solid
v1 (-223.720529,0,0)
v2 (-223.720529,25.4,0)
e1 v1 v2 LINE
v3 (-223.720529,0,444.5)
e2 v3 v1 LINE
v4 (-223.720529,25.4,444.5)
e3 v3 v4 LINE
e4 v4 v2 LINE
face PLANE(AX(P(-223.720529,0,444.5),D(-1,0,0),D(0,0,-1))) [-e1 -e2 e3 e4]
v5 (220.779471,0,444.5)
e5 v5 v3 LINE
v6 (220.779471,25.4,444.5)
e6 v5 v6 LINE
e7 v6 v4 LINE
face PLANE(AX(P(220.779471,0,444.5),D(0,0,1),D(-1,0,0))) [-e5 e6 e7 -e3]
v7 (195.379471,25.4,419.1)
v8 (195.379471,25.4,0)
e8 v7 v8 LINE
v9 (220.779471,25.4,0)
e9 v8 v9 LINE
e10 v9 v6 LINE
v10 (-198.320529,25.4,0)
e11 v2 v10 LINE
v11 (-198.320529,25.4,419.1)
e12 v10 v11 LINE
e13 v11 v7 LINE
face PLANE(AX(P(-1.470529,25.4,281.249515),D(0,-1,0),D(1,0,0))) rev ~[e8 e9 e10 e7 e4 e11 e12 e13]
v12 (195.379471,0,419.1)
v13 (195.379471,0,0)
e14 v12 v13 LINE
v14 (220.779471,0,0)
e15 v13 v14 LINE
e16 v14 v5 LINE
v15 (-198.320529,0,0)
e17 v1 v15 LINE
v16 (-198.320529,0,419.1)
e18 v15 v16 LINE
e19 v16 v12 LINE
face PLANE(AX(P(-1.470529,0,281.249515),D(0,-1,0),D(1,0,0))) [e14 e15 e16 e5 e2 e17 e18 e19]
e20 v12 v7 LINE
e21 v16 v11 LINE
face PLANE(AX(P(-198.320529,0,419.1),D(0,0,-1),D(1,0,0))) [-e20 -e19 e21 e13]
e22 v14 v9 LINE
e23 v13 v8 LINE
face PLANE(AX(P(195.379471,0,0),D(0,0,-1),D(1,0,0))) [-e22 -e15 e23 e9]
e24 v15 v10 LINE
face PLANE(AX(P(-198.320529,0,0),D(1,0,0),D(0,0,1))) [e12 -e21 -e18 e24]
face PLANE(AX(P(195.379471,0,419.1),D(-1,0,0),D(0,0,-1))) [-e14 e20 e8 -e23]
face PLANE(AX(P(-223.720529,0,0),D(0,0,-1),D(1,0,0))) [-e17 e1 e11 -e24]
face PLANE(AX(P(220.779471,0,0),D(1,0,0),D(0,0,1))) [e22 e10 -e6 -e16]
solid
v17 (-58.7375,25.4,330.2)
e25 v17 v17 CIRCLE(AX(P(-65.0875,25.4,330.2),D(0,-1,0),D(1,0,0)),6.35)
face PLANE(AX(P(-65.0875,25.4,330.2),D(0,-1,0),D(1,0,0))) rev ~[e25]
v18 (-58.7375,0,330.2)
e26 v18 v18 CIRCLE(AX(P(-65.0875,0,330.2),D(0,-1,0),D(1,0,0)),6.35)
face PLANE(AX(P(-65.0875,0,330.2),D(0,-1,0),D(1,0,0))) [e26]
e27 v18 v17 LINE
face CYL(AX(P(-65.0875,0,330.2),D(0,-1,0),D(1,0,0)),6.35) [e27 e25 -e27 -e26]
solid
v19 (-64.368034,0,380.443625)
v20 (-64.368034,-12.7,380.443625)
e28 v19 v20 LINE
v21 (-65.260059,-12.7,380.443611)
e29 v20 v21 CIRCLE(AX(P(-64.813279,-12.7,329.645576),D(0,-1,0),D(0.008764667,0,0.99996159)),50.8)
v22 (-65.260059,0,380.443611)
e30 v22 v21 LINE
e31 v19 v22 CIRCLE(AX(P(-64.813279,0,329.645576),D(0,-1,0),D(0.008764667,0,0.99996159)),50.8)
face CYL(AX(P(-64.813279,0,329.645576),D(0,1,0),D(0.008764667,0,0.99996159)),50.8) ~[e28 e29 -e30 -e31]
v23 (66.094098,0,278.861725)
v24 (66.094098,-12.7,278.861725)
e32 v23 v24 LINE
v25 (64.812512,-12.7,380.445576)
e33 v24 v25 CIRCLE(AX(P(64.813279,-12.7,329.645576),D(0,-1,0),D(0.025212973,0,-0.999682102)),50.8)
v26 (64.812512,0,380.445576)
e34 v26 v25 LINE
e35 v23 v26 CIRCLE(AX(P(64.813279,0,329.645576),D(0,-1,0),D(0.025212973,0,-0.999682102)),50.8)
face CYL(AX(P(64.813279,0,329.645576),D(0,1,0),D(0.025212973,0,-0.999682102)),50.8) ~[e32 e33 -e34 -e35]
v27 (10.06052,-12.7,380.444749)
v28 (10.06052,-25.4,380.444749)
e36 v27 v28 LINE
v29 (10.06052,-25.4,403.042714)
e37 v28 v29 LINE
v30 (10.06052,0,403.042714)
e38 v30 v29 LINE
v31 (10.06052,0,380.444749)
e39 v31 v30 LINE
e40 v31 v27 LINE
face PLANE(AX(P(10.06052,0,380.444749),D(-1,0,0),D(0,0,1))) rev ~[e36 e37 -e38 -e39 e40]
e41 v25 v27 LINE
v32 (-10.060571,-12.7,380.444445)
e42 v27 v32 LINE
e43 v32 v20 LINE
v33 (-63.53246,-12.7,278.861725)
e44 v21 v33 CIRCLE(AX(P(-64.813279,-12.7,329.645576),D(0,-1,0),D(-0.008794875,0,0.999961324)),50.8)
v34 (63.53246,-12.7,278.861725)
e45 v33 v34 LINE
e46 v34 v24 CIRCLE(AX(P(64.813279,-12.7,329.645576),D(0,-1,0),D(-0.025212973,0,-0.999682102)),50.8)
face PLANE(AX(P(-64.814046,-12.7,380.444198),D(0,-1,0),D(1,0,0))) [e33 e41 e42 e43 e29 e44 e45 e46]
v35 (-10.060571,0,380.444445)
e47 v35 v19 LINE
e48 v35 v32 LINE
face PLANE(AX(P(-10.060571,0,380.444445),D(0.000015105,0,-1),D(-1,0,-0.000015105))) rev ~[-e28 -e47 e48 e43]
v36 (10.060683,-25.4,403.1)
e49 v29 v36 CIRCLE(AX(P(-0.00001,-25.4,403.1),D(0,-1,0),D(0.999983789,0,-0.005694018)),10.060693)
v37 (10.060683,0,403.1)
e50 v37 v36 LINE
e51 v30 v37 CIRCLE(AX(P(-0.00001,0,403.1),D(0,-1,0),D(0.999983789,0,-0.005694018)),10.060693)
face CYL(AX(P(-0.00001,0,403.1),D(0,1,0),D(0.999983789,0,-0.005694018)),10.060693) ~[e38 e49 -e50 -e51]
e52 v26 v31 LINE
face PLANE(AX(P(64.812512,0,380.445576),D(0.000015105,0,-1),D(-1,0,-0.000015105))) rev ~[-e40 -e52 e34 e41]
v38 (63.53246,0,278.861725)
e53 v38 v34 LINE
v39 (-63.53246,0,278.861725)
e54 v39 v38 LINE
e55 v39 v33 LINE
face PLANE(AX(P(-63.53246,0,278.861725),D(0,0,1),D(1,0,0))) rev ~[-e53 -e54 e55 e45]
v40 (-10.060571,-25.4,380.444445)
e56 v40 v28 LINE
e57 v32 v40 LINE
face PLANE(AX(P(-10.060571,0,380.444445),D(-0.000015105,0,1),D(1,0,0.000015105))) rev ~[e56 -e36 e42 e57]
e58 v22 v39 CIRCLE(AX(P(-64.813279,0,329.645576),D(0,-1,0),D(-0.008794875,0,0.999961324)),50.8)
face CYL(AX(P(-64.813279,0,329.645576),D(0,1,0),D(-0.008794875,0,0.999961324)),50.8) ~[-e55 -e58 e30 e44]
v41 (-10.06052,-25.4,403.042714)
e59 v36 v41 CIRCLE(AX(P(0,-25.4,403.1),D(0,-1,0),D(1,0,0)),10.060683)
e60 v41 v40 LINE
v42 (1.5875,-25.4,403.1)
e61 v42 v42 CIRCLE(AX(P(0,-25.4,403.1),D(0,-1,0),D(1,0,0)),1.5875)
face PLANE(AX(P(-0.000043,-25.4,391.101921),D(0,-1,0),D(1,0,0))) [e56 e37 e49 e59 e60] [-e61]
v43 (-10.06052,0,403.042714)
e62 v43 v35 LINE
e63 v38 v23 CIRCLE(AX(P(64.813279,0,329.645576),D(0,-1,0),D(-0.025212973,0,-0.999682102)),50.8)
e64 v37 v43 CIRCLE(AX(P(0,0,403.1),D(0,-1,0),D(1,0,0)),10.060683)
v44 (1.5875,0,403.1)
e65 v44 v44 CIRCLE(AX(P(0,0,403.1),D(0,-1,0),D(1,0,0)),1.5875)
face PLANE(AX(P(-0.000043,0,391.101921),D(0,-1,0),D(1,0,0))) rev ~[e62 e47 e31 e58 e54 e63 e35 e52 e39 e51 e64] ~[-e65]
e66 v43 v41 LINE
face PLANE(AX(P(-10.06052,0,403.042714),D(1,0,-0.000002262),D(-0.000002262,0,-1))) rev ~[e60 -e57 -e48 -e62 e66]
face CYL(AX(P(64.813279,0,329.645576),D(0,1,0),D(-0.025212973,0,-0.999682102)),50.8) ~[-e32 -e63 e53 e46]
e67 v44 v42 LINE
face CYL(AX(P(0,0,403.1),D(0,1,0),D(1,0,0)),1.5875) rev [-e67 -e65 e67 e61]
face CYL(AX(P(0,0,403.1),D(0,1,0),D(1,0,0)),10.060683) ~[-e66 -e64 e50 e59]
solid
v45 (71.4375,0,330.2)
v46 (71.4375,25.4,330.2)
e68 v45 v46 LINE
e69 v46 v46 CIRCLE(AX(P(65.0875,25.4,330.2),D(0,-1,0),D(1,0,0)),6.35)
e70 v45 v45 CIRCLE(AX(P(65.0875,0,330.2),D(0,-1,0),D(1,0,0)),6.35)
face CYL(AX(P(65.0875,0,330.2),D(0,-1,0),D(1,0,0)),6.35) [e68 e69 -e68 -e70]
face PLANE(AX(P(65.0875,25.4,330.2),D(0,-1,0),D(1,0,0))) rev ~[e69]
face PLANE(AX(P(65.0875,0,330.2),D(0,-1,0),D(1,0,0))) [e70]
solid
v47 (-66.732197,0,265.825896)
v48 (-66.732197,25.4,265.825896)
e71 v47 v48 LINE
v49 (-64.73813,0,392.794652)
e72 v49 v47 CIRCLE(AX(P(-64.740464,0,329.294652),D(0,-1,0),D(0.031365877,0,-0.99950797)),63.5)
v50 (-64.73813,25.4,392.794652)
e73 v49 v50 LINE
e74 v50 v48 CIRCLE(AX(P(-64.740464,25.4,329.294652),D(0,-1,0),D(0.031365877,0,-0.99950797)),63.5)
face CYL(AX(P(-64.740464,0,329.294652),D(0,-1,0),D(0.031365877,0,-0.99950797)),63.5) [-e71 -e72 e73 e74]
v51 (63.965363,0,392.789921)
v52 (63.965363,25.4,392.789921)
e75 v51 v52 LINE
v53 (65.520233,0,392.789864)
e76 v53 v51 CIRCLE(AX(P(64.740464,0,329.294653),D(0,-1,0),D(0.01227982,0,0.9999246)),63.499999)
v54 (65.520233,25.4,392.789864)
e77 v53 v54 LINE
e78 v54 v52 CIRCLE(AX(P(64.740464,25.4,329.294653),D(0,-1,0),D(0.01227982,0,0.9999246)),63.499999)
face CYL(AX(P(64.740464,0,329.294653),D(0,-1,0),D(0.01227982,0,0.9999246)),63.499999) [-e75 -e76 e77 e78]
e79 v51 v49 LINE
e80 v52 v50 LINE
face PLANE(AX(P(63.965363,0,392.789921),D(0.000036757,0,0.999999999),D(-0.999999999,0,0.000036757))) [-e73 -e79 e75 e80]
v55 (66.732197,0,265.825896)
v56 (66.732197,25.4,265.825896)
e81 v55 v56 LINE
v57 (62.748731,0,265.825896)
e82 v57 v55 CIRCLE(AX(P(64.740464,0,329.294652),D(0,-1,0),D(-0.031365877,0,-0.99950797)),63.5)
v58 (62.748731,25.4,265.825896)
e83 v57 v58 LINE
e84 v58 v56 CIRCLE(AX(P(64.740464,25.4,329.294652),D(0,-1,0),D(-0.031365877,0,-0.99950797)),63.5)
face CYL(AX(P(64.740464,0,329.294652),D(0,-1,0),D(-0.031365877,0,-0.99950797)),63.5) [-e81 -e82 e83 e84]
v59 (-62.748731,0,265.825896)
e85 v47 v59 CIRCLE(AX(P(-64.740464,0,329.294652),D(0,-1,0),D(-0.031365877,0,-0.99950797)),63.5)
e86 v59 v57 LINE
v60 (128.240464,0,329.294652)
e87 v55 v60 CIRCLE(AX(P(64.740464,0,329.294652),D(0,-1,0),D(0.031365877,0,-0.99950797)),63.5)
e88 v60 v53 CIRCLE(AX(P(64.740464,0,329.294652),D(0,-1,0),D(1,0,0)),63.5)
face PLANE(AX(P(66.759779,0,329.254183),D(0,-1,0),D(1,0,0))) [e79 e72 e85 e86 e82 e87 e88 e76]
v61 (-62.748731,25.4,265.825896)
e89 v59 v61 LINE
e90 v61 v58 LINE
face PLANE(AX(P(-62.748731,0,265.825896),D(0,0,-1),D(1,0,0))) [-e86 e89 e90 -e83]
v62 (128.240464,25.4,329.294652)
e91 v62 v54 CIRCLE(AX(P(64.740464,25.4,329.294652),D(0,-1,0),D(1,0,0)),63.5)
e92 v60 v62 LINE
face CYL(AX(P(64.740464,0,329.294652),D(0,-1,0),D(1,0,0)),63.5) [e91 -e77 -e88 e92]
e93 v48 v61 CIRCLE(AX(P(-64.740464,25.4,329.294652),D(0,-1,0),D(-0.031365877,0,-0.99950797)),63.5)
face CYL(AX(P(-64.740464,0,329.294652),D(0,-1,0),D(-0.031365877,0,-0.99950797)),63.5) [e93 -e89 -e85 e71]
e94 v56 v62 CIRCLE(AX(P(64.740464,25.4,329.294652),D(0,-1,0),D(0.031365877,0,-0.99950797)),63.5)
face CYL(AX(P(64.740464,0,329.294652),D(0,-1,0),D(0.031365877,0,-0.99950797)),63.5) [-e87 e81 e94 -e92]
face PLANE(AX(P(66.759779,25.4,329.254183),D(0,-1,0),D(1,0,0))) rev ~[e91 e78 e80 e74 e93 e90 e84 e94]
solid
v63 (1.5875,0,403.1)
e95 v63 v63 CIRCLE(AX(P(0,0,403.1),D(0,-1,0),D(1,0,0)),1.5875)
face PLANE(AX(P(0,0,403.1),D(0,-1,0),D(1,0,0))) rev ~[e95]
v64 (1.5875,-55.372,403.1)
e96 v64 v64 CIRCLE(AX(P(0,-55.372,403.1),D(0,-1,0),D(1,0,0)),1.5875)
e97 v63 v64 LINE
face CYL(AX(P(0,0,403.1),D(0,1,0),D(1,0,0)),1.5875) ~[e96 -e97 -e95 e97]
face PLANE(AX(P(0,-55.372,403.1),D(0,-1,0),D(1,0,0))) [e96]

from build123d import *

# Parameters (mm, degrees)
F1_DEPTH = 25.4
F2_R     = 6.35
F3_DEPTH = 12.7
F2_R_2   = 1.5875
F4_DEPTH = 25.4
F5_DEPTH = 55.372
F6_DEPTH = 25.4
F8_DEPTH = 25.4


with BuildPart() as f1:
    # F0 (on Front) → F1 (new body)
    with BuildSketch(Plane.XZ):
        Polygon((220.7794714003, 444.5), (-223.7205285997, 444.5), (-223.7205285997, 0), (-198.3205285997, 0), (-198.3205285997, 419.1), (195.3794714003, 419.1), (195.3794714003, 0), (220.7794714003, 0), align=None)
    extrude(amount=-F1_DEPTH)


with BuildPart() as f3:
    # F2 (on face) → F3 (new body)
    with BuildSketch(Plane.XZ):
        with BuildLine():
            Line((-65.2600586708, 380.4436114409), (-64.3680339263, 380.4436249147))
            ThreePointArc((-64.3680339263, 380.4436249147), (-64.8140463281, 380.4455761588), (-65.2600586708, 380.4436114409))
        make_face()
        with BuildLine():
            Line((-10.0605708618, 380.4444452172), (-64.3680339263, 380.4436249147))
            Line((-64.3680339263, 380.4436249147), (-65.2600586708, 380.4436114409))
            ThreePointArc((-65.2600586708, 380.4436114409), (-115.6059339898, 328.7817476998), (-63.532459971, 278.8617253594))
            Line((-63.532459971, 278.8617253594), (63.532459971, 278.8617253594))
            Line((63.532459971, 278.8617253594), (66.0940980393, 278.8617253594))
            ThreePointArc((66.0940980393, 278.8617253594), (115.6092367076, 330.2864202149), (64.8125116822, 380.4455761588))
            Line((64.8125116822, 380.4455761588), (10.060519749, 380.4447491419))
            Line((10.060519749, 380.4447491419), (10.060519749, 330.9917804861))
            ThreePointArc((10.060519749, 330.9917804861), (10.0606420697, 330.963137726), (10.0606828434, 330.9344947338))
            ThreePointArc((10.0606828434, 330.9344947338), (10.0606420697, 330.9058517416), (10.060519749, 330.8772089815))
            ThreePointArc((10.060519749, 330.8772089815), (-0.0286543698, 320.8738526965), (-10.0606828434, 330.9345174891))
            Line((-10.0606828434, 330.9345174891), (-10.0605708618, 380.4444452172))
        make_face()
        with Locations((-65.0875, 330.2)):
            Circle(F2_R, mode=Mode.SUBTRACT)
        with Locations((65.0875, 330.2)):
            Circle(F2_R, mode=Mode.SUBTRACT)
        with BuildLine():
            Line((10.060519749, 380.4447491419), (-10.0605708618, 380.4444452172))
            Line((-10.0605708618, 380.4444452172), (-10.0606828434, 330.9345174891))
            ThreePointArc((-10.0606828434, 330.9345174891), (-0.0286316146, 340.9951368359), (10.060519749, 330.9917804861))
            Line((10.060519749, 330.9917804861), (10.060519749, 380.4447491419))
        make_face()
        with BuildLine():
            ThreePointArc((10.060519749, 330.9917804861), (-0.0286316146, 340.9951368359), (-10.0606828434, 330.9345174891))
            ThreePointArc((-10.0606828434, 330.9345174891), (-0.0286543698, 320.8738526965), (10.060519749, 330.8772089815))
            Line((10.060519749, 330.8772089815), (10.060519749, 330.9917804861))
        make_face()
        with BuildLine():
            Line((66.0940980393, 278.8617253594), (63.532459971, 278.8617253594))
            ThreePointArc((63.532459971, 278.8617253594), (64.8132790052, 278.8455761646), (66.0940980393, 278.8617253594))
        make_face()
        with BuildLine():
            ThreePointArc((10.0606828434, 330.9344947338), (10.0606420697, 330.963137726), (10.060519749, 330.9917804861))
            Line((10.060519749, 330.9917804861), (10.060519749, 330.8772089815))
            ThreePointArc((10.060519749, 330.8772089815), (10.0606420697, 330.9058517416), (10.0606828434, 330.9344947338))
        make_face()
        with Locations((-65.0875, 330.2)):
            Circle(F2_R)
        with Locations((65.0875, 330.2)):
            Circle(F2_R)
    extrude(amount=F3_DEPTH)

    # F2 (on face) → F4 (join)
    with BuildSketch(Plane.XZ):
        with BuildLine():
            Line((-10.060519749, 403.0427142477), (-10.0605708618, 380.4444452172))
            Line((-10.0605708618, 380.4444452172), (10.060519749, 380.4447491419))
            Line((10.060519749, 380.4447491419), (10.060519749, 403.0427142477))
            ThreePointArc((10.060519749, 403.0427142477), (0, 393.0393171566), (-10.060519749, 403.0427142477))
        make_face()
        with BuildLine():
            ThreePointArc((10.0606828434, 403.1), (-0.0286429922, 413.1606420697), (-10.060519749, 403.0427142477))
            ThreePointArc((-10.060519749, 403.0427142477), (0, 393.0393171566), (10.060519749, 403.0427142477))
            ThreePointArc((10.060519749, 403.0427142477), (10.0606420697, 403.0713570078), (10.0606828434, 403.1))
        make_face()
        with Locations((0, 403.1)):
            Circle(F2_R_2, mode=Mode.SUBTRACT)
    extrude(amount=F4_DEPTH)


with BuildPart() as f5:
    # F2 (on face) → F5 (new body)
    with BuildSketch(Plane.XZ):
        with Locations((0, 403.1)):
            Circle(F2_R_2)
    extrude(amount=F5_DEPTH)


with BuildPart() as f6:
    # F2 (on face) → F6 (new body)
    with BuildSketch(Plane.XZ):
        with Locations((65.0875, 330.2)):
            Circle(F2_R)
    extrude(amount=-F6_DEPTH)


with BuildPart() as f6b:
    # F2 (on face) → F6, piece 2 (new body)
    with BuildSketch(Plane.XZ):
        with Locations((-65.0875, 330.2)):
            Circle(F2_R)
    extrude(amount=-F6_DEPTH)


with BuildPart() as f8:
    # F7 (on face) → F8 (new body)
    with BuildSketch(Plane.XZ):
        with BuildLine():
            ThreePointArc((66.7321972552, 265.8258956615), (110.3404918101, 285.1031653263), (128.2404640913, 329.2946517467))
            ThreePointArc((128.2404640913, 329.2946517467), (109.916593326, 373.9193909323), (65.5202326779, 392.7898638572))
            Line((65.5202326779, 392.7898638572), (63.9653632353, 392.7899210088))
            ThreePointArc((63.9653632353, 392.7899210088), (1.24337931, 329.9031123291), (62.7487309274, 265.8258956615))
            Line((62.7487309274, 265.8258956615), (66.7321972552, 265.8258956615))
        make_face()
        with BuildLine():
            Line((63.9653632353, 392.7899210088), (65.5202326779, 392.7898638572))
            ThreePointArc((65.5202326779, 392.7898638572), (64.7427981316, 392.7946517039), (63.9653632353, 392.7899210088))
        make_face()
        with BuildLine():
            ThreePointArc((62.7487309274, 265.8258956615), (64.7404640913, 265.7946517467), (66.7321972552, 265.8258956615))
            Line((66.7321972552, 265.8258956615), (62.7487309274, 265.8258956615))
        make_face()
        with BuildLine():
            ThreePointArc((62.7487309274, 265.8258956615), (1.24337931, 329.9031123291), (63.9653632353, 392.7899210088))
            Line((63.9653632353, 392.7899210088), (-64.738130051, 392.7946517039))
            ThreePointArc((-64.738130051, 392.7946517039), (-19.8383582857, 374.1951071367), (-1.2404640913, 329.2946517467))
            ThreePointArc((-1.2404640913, 329.2946517467), (-19.1404363725, 285.1031653263), (-62.7487309274, 265.8258956615))
            Line((-62.7487309274, 265.8258956615), (62.7487309274, 265.8258956615))
        make_face()
        with BuildLine():
            ThreePointArc((-1.2404640913, 329.2946517467), (-19.8383582857, 374.1951071367), (-64.738130051, 392.7946517039))
            ThreePointArc((-64.738130051, 392.7946517039), (-128.2326343169, 330.2918077268), (-66.7321972552, 265.8258956615))
            Line((-66.7321972552, 265.8258956615), (-62.7487309274, 265.8258956615))
            ThreePointArc((-62.7487309274, 265.8258956615), (-19.1404363725, 285.1031653263), (-1.2404640913, 329.2946517467))
        make_face()
        with BuildLine():
            ThreePointArc((-66.7321972552, 265.8258956615), (-64.7404640913, 265.7946517467), (-62.7487309274, 265.8258956615))
            Line((-62.7487309274, 265.8258956615), (-66.7321972552, 265.8258956615))
        make_face()
    extrude(amount=-F8_DEPTH)


solid = Compound([f1.part, f3.part, f5.part, f6.part, f6b.part, f8.part])
